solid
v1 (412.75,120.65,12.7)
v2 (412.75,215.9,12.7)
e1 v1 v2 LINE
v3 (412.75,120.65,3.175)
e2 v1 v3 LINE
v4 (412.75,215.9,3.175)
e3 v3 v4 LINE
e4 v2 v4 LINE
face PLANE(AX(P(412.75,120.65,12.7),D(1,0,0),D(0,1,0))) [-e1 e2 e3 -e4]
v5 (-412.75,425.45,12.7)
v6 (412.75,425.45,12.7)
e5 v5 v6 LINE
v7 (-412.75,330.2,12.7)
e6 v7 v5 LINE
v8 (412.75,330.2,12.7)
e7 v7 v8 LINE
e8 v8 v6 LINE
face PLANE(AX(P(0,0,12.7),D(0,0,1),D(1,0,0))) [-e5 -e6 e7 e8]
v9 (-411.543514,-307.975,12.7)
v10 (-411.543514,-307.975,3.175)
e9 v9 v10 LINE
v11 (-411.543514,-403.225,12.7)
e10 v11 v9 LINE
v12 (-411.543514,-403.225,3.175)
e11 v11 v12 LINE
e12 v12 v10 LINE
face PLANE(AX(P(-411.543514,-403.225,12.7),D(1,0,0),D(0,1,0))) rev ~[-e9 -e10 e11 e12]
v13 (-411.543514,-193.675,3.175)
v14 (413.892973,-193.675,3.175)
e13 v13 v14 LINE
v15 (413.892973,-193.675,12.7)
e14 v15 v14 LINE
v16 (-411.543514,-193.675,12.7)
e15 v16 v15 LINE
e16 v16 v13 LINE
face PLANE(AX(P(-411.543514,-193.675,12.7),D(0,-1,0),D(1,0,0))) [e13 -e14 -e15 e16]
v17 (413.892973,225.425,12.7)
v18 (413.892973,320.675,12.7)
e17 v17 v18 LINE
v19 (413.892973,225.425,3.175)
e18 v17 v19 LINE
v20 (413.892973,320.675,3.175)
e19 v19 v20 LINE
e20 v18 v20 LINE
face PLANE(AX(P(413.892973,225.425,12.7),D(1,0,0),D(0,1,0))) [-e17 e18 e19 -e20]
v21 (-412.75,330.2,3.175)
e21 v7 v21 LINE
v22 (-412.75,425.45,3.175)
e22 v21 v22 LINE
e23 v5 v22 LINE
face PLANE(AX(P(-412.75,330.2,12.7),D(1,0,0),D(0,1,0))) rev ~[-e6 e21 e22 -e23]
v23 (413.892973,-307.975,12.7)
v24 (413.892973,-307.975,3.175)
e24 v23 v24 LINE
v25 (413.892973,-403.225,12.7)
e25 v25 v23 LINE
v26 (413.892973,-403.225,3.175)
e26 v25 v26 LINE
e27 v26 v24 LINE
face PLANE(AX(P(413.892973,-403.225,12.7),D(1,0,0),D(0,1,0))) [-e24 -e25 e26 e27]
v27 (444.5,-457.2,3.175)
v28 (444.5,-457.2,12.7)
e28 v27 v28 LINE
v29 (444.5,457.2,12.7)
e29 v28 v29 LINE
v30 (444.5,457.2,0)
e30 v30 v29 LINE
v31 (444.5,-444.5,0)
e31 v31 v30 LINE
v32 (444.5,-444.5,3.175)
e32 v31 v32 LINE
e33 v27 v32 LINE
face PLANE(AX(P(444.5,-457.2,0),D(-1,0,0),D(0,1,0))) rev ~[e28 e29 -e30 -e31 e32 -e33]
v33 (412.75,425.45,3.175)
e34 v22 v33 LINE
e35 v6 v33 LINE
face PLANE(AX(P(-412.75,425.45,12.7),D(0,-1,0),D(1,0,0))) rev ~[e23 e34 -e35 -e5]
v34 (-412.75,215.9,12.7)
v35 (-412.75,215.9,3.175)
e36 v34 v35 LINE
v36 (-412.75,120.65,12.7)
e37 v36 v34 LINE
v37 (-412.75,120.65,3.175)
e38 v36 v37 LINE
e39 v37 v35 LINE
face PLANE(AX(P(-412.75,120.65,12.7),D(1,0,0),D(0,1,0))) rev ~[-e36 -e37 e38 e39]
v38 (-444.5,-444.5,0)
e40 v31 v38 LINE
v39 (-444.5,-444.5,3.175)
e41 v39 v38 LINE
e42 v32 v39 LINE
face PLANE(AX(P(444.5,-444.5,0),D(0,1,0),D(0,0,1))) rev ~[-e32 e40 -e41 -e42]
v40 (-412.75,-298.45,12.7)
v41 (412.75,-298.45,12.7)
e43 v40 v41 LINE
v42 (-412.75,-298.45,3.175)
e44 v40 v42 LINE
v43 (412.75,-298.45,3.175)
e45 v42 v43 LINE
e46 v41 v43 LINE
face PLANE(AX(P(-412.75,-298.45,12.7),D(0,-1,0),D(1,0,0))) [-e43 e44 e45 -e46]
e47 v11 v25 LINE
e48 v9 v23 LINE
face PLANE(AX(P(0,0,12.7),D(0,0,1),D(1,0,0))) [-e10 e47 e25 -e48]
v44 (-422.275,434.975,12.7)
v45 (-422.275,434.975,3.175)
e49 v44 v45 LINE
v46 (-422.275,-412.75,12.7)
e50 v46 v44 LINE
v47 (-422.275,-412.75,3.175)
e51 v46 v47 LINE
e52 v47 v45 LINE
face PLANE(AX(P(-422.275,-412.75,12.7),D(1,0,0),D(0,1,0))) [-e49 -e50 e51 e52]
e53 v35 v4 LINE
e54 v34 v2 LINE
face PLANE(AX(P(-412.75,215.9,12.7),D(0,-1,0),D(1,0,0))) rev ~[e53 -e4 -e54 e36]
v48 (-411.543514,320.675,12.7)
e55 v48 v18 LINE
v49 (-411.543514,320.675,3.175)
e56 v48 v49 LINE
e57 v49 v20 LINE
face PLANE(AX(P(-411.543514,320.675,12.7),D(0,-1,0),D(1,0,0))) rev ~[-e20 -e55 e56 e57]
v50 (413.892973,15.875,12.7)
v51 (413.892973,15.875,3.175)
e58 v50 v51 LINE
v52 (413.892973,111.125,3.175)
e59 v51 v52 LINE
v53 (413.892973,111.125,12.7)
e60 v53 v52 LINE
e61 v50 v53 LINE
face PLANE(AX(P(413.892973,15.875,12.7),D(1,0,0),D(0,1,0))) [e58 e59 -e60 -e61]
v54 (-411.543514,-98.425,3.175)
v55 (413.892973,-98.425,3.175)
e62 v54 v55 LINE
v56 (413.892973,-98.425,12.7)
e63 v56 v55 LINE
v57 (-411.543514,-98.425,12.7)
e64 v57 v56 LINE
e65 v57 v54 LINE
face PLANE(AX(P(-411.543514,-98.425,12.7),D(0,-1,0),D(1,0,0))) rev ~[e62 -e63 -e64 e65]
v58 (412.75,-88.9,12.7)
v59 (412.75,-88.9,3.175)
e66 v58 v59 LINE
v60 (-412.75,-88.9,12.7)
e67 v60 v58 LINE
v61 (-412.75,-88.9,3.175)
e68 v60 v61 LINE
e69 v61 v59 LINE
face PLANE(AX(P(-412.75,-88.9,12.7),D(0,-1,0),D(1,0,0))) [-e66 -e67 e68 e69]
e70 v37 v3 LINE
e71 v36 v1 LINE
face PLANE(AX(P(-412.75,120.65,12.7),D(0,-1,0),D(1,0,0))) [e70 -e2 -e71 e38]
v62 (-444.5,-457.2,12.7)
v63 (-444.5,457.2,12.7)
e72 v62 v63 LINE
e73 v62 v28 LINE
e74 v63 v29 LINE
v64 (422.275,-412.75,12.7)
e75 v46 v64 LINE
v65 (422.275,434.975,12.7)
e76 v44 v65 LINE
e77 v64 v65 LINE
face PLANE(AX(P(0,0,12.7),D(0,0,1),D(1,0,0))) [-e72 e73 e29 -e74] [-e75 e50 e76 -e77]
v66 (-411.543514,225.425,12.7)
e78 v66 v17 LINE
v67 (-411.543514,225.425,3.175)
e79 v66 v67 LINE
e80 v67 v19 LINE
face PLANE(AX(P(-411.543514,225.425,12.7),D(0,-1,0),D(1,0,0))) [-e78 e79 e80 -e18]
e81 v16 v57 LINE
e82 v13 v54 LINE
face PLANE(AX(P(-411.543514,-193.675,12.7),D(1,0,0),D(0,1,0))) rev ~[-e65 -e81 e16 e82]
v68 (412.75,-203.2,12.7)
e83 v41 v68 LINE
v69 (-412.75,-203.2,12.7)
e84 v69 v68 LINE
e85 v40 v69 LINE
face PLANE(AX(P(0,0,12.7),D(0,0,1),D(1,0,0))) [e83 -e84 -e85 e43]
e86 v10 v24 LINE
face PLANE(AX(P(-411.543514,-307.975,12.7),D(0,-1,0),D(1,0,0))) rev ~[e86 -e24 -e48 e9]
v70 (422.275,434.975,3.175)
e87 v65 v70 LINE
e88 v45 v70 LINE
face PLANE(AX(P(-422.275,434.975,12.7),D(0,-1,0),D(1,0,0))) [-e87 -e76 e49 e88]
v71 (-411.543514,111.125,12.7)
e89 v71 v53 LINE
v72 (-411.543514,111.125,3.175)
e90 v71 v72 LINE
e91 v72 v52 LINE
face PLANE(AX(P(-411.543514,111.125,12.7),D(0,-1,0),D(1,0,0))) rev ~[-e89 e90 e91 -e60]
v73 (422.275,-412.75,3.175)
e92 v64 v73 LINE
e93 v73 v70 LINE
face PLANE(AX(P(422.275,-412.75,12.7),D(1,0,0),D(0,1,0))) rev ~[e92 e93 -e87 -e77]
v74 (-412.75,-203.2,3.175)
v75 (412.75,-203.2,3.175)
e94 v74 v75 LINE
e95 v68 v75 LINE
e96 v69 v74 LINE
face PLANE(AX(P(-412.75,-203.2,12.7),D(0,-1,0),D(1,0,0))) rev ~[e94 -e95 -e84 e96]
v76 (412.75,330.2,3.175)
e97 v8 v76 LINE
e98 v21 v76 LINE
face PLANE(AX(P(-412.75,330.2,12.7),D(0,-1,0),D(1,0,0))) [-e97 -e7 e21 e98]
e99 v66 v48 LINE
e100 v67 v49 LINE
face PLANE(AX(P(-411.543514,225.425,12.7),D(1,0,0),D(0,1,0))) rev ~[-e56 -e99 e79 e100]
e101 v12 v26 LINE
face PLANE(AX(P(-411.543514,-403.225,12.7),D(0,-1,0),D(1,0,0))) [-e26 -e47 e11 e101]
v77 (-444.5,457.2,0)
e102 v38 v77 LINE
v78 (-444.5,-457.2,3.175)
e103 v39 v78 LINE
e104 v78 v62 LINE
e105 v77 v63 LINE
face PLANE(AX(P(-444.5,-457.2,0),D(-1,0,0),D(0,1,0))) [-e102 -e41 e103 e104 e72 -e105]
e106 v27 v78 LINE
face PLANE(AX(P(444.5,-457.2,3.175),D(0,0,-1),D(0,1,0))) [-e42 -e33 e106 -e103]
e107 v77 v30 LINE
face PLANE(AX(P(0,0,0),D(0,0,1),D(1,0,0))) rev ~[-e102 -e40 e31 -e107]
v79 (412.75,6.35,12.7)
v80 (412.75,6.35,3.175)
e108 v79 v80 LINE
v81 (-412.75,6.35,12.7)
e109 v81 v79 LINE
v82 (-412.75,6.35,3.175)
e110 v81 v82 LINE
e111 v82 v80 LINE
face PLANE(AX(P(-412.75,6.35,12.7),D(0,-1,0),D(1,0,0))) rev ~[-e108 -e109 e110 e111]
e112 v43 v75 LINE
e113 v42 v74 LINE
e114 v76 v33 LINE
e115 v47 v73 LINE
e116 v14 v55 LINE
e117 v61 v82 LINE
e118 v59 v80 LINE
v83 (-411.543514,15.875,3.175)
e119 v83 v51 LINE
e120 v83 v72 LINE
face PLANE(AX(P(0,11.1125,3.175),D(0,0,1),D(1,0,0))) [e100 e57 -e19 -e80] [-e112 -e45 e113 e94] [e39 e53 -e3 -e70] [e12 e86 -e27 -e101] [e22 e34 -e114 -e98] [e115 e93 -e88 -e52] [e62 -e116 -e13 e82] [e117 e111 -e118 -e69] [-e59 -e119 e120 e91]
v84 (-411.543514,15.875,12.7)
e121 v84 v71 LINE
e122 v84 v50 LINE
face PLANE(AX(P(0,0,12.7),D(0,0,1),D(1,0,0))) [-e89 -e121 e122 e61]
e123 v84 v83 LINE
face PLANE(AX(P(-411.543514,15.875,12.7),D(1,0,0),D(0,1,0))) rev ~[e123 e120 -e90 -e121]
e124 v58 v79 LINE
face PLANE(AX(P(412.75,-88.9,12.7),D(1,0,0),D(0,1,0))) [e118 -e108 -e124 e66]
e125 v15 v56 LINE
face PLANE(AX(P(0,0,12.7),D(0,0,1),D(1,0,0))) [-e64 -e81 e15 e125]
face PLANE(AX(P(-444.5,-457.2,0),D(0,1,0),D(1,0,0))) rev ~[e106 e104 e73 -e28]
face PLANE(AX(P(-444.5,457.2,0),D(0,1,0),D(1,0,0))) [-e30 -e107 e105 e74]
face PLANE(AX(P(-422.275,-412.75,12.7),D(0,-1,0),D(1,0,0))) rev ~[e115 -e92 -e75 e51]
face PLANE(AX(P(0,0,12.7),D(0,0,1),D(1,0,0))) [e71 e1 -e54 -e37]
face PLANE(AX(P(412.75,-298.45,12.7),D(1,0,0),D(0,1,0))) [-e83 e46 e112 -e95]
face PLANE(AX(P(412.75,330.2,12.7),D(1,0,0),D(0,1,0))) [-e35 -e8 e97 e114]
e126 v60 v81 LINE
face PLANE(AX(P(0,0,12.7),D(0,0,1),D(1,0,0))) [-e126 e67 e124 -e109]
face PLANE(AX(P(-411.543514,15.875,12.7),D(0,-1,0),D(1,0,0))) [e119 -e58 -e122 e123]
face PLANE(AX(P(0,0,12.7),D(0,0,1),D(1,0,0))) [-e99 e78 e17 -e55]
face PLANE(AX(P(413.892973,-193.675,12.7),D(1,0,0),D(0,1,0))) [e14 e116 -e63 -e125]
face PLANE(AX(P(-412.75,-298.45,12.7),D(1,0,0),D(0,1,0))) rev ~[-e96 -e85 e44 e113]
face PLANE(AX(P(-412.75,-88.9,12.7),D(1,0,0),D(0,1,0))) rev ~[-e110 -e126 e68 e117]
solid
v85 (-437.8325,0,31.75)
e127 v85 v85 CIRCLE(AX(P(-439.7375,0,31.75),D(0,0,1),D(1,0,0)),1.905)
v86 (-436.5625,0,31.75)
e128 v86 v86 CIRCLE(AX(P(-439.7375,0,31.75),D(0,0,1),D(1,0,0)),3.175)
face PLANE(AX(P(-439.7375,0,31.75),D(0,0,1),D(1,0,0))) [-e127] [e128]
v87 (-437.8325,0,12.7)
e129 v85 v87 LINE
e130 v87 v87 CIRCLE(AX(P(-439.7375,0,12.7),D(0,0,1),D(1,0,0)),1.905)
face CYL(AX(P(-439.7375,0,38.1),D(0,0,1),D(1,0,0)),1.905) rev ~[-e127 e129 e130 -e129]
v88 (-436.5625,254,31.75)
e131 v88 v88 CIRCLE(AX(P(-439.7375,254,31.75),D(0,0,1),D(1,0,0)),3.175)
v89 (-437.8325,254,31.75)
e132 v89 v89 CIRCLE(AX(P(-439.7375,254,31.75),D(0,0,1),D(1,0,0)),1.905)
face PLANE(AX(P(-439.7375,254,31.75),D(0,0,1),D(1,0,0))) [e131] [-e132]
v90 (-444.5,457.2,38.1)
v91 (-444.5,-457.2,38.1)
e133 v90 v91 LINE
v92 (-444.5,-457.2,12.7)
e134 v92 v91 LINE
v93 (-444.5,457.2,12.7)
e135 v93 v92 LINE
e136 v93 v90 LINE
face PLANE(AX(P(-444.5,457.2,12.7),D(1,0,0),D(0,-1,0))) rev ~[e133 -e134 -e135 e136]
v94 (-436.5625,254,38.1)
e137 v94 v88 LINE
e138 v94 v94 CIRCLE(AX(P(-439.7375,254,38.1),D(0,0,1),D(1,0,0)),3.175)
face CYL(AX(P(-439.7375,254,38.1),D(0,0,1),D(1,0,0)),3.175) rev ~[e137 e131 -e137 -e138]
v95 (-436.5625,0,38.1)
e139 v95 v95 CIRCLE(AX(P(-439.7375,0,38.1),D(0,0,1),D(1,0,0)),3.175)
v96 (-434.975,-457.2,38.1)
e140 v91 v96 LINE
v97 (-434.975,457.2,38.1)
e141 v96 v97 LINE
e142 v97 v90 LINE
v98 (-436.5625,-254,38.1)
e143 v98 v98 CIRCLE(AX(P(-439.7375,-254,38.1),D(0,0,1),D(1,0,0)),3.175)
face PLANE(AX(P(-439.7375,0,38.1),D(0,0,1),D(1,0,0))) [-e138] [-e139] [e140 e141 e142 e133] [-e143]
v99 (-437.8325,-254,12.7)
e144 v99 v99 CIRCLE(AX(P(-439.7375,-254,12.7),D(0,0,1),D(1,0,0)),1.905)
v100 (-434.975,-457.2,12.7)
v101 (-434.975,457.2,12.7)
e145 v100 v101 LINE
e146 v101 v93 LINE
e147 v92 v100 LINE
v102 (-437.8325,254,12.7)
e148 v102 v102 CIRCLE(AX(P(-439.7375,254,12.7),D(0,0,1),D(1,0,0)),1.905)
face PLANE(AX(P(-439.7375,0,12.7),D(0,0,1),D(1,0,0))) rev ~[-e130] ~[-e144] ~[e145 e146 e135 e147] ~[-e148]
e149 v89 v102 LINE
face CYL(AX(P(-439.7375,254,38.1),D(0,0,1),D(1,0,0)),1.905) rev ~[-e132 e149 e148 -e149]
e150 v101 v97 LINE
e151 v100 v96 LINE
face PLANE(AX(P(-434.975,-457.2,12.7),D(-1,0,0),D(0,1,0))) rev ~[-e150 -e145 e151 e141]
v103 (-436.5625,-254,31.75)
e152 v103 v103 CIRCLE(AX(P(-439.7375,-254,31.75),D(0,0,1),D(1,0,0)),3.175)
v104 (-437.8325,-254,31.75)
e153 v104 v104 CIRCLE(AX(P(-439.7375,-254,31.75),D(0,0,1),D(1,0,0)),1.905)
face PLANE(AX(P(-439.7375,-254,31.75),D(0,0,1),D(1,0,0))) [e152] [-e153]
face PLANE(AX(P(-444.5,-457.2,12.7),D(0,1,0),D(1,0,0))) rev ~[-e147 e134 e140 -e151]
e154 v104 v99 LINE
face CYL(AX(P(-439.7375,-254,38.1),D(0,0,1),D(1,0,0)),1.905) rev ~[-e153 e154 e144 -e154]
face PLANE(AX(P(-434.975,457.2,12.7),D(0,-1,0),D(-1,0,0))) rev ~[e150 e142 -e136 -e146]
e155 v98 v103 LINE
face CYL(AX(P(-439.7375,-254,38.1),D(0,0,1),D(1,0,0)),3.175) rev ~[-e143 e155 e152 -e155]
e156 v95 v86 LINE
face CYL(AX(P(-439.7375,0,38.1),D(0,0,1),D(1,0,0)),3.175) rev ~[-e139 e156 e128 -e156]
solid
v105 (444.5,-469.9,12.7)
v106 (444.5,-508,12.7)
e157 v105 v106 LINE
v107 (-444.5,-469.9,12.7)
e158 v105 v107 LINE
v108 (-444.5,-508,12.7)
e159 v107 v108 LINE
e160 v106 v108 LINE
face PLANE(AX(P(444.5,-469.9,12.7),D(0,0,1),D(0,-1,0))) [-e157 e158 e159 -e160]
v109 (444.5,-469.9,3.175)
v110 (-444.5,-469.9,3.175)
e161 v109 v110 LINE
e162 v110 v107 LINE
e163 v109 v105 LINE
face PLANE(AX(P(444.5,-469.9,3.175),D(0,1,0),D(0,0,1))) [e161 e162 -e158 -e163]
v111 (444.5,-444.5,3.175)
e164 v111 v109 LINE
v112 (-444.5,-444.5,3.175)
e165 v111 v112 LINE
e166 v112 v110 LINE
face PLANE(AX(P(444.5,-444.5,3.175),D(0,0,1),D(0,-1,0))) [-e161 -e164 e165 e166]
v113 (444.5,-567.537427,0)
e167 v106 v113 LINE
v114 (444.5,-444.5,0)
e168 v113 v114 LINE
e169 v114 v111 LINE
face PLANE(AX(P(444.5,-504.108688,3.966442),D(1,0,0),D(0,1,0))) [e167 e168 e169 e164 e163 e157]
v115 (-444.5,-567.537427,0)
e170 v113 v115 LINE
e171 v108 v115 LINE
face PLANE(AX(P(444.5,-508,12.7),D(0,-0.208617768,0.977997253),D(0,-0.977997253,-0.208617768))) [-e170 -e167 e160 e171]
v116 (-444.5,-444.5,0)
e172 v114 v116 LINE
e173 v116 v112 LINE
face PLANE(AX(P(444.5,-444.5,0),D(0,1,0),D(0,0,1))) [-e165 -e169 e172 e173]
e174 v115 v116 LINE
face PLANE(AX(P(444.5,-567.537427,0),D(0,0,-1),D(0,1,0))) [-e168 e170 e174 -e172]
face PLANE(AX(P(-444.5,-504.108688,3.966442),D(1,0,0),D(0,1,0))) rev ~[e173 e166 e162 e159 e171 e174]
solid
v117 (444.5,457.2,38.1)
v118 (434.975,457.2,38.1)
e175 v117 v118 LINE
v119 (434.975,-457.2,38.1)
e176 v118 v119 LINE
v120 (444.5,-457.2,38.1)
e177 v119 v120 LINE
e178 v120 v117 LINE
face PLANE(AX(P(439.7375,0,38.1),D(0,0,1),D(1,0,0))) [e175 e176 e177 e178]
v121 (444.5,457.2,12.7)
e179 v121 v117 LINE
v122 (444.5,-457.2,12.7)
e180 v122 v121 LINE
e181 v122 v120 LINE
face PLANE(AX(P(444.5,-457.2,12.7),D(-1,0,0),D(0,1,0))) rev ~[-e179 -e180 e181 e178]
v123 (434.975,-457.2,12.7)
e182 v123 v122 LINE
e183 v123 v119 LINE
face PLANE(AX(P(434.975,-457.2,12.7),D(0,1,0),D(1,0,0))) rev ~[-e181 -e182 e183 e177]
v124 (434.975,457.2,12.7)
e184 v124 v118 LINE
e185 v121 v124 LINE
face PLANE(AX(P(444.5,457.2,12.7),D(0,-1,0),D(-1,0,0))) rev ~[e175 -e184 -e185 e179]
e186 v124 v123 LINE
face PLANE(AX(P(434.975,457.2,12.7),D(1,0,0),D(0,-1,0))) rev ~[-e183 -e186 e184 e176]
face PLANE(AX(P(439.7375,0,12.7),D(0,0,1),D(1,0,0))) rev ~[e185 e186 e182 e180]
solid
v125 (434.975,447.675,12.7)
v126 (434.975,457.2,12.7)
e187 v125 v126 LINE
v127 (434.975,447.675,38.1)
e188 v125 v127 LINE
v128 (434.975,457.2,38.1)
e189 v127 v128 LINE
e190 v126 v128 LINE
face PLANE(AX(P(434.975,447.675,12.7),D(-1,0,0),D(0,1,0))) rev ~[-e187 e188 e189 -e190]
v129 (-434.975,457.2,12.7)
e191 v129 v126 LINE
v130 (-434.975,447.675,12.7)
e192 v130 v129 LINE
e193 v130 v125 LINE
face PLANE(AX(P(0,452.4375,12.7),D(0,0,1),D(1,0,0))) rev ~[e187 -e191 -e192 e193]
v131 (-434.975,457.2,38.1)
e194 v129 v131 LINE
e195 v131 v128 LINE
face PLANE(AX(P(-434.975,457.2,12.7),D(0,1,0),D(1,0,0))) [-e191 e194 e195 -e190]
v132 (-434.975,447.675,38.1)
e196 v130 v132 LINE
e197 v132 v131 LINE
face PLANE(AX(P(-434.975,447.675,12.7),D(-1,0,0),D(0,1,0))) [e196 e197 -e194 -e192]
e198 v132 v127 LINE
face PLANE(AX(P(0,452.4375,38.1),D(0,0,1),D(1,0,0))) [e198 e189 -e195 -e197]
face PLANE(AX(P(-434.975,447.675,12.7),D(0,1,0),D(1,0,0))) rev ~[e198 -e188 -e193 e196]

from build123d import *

# Parameters (mm, degrees)
F0_W      = 889
F0_H      = 914.4
F1_DEPTH  = 12.7
F2_W      = 12.7
F2_H      = 3.175
F3_DEPTH  = 889.001
F5_DEPTH  = 889
F7_DEPTH  = 25.4
F8_DEPTH  = 25.4
F6_W      = 869.95
F6_H      = 9.525
F9_DEPTH  = 25.4
F10_W     = 844.55
F10_H     = 847.725
F10_W_2   = 825.4364864731
F10_H_2   = 95.25
F10_W_3   = 825.5
F11_DEPTH = 9.525
F13_R     = 3.175
F13_R_2   = 1.905
F14_DEPTH = 6.35
F15_DEPTH = 25.4


with BuildPart() as f1:
    # F0 (on Top) → F1 (new body)
    with BuildSketch(Plane.XY):
        Rectangle(F0_W, F0_H)
    extrude(amount=F1_DEPTH)

    # F2 (on face) → F3 (cut, through all)
    with BuildSketch(Plane.YZ.offset(444.5)):
        with Locations((-450.85, 1.5875)):
            Rectangle(F2_W, F2_H)
    extrude(amount=-F3_DEPTH, mode=Mode.SUBTRACT)

    # F10 (on face) → F11 (cut)
    with BuildSketch(Plane.XY.offset(12.7)):
        with Locations((0, 11.1125)):
            Rectangle(F10_W, F10_H)
        with Locations((1.1747297096, -355.6)):
            Rectangle(F10_W_2, F10_H_2, mode=Mode.SUBTRACT)
        with Locations((0, -250.825)):
            Rectangle(F10_W_3, F10_H_2, mode=Mode.SUBTRACT)
        with Locations((1.1747297096, -146.05)):
            Rectangle(F10_W_2, F10_H_2, mode=Mode.SUBTRACT)
        with Locations((0, -41.275)):
            Rectangle(F10_W_3, F10_H_2, mode=Mode.SUBTRACT)
        with Locations((1.1747297096, 63.5)):
            Rectangle(F10_W_2, F10_H_2, mode=Mode.SUBTRACT)
        with Locations((0, 168.275)):
            Rectangle(F10_W_3, F10_H_2, mode=Mode.SUBTRACT)
        with Locations((1.1747297096, 273.05)):
            Rectangle(F10_W_2, F10_H_2, mode=Mode.SUBTRACT)
        with Locations((0, 377.825)):
            Rectangle(F10_W_3, F10_H_2, mode=Mode.SUBTRACT)
    extrude(amount=-F11_DEPTH, mode=Mode.SUBTRACT)


with BuildPart() as f5:
    # F4 (on face) → F5 (new body, through all)
    with BuildSketch(Plane.YZ.offset(444.5)):
        Polygon((-469.9, 12.7), (-508, 12.7), (-567.5374269485, 0), (-444.5, 0), (-444.5, 3.175), (-457.2, 3.175), (-469.9, 3.175), align=None)
    extrude(amount=-F5_DEPTH)


with BuildPart() as f7:
    # F6 (on face) → F7 (new body)
    with BuildSketch(Plane.XY.offset(12.7)):
        Polygon((434.975, -457.2), (444.5, -457.2), (444.5, 457.2), (434.975, 457.2), (434.975, 447.675), align=None)
    extrude(amount=F7_DEPTH)


with BuildPart() as f8:
    # F6 (on face) → F8 (new body)
    with BuildSketch(Plane.XY.offset(12.7)):
        Polygon((-444.5, -457.2), (-434.975, -457.2), (-434.975, 447.675), (-434.975, 457.2), (-444.5, 457.2), align=None)
    extrude(amount=F8_DEPTH)

    # F13 (on face) → F14 (cut)
    with BuildSketch(Plane.XY.offset(38.1)):
        with Locations((-439.7375, -254)):
            Circle(F13_R)
        with Locations((-439.7375, -254)):
            Circle(F13_R_2, mode=Mode.SUBTRACT)
        with Locations((-439.7375, 0)):
            Circle(F13_R)
        with Locations((-439.7375, 0)):
            Circle(F13_R_2, mode=Mode.SUBTRACT)
        with Locations((-439.7375, 254)):
            Circle(F13_R)
        with Locations((-439.7375, 254)):
            Circle(F13_R_2, mode=Mode.SUBTRACT)
        with Locations((439.7375, 254)):
            Circle(F13_R)
        with Locations((439.7375, 254)):
            Circle(F13_R_2, mode=Mode.SUBTRACT)
        with Locations((439.7375, 0)):
            Circle(F13_R)
        with Locations((439.7375, 0)):
            Circle(F13_R_2, mode=Mode.SUBTRACT)
        with Locations((439.7375, -254)):
            Circle(F13_R)
        with Locations((439.7375, -254)):
            Circle(F13_R_2, mode=Mode.SUBTRACT)
    extrude(amount=-F14_DEPTH, mode=Mode.SUBTRACT)

    # F15 (cut, through all): faces of the model
    f15_faces = [f8.faces().sort_by_distance(p)[0] for p in [
        (-439.7375, -254, 38.1),
        (-439.7375, 0, 38.1),
        (-439.7375, 254, 38.1),
    ]]
    extrude(f15_faces, amount=-F15_DEPTH, mode=Mode.SUBTRACT)


with BuildPart() as f9:
    # F6 (on face) → F9 (new body)
    with BuildSketch(Plane.XY.offset(12.7)):
        with Locations((0, 452.4375)):
            Rectangle(F6_W, F6_H)
    extrude(amount=F9_DEPTH)


solid = Compound([f1.part, f5.part, f7.part, f8.part, f9.part])
